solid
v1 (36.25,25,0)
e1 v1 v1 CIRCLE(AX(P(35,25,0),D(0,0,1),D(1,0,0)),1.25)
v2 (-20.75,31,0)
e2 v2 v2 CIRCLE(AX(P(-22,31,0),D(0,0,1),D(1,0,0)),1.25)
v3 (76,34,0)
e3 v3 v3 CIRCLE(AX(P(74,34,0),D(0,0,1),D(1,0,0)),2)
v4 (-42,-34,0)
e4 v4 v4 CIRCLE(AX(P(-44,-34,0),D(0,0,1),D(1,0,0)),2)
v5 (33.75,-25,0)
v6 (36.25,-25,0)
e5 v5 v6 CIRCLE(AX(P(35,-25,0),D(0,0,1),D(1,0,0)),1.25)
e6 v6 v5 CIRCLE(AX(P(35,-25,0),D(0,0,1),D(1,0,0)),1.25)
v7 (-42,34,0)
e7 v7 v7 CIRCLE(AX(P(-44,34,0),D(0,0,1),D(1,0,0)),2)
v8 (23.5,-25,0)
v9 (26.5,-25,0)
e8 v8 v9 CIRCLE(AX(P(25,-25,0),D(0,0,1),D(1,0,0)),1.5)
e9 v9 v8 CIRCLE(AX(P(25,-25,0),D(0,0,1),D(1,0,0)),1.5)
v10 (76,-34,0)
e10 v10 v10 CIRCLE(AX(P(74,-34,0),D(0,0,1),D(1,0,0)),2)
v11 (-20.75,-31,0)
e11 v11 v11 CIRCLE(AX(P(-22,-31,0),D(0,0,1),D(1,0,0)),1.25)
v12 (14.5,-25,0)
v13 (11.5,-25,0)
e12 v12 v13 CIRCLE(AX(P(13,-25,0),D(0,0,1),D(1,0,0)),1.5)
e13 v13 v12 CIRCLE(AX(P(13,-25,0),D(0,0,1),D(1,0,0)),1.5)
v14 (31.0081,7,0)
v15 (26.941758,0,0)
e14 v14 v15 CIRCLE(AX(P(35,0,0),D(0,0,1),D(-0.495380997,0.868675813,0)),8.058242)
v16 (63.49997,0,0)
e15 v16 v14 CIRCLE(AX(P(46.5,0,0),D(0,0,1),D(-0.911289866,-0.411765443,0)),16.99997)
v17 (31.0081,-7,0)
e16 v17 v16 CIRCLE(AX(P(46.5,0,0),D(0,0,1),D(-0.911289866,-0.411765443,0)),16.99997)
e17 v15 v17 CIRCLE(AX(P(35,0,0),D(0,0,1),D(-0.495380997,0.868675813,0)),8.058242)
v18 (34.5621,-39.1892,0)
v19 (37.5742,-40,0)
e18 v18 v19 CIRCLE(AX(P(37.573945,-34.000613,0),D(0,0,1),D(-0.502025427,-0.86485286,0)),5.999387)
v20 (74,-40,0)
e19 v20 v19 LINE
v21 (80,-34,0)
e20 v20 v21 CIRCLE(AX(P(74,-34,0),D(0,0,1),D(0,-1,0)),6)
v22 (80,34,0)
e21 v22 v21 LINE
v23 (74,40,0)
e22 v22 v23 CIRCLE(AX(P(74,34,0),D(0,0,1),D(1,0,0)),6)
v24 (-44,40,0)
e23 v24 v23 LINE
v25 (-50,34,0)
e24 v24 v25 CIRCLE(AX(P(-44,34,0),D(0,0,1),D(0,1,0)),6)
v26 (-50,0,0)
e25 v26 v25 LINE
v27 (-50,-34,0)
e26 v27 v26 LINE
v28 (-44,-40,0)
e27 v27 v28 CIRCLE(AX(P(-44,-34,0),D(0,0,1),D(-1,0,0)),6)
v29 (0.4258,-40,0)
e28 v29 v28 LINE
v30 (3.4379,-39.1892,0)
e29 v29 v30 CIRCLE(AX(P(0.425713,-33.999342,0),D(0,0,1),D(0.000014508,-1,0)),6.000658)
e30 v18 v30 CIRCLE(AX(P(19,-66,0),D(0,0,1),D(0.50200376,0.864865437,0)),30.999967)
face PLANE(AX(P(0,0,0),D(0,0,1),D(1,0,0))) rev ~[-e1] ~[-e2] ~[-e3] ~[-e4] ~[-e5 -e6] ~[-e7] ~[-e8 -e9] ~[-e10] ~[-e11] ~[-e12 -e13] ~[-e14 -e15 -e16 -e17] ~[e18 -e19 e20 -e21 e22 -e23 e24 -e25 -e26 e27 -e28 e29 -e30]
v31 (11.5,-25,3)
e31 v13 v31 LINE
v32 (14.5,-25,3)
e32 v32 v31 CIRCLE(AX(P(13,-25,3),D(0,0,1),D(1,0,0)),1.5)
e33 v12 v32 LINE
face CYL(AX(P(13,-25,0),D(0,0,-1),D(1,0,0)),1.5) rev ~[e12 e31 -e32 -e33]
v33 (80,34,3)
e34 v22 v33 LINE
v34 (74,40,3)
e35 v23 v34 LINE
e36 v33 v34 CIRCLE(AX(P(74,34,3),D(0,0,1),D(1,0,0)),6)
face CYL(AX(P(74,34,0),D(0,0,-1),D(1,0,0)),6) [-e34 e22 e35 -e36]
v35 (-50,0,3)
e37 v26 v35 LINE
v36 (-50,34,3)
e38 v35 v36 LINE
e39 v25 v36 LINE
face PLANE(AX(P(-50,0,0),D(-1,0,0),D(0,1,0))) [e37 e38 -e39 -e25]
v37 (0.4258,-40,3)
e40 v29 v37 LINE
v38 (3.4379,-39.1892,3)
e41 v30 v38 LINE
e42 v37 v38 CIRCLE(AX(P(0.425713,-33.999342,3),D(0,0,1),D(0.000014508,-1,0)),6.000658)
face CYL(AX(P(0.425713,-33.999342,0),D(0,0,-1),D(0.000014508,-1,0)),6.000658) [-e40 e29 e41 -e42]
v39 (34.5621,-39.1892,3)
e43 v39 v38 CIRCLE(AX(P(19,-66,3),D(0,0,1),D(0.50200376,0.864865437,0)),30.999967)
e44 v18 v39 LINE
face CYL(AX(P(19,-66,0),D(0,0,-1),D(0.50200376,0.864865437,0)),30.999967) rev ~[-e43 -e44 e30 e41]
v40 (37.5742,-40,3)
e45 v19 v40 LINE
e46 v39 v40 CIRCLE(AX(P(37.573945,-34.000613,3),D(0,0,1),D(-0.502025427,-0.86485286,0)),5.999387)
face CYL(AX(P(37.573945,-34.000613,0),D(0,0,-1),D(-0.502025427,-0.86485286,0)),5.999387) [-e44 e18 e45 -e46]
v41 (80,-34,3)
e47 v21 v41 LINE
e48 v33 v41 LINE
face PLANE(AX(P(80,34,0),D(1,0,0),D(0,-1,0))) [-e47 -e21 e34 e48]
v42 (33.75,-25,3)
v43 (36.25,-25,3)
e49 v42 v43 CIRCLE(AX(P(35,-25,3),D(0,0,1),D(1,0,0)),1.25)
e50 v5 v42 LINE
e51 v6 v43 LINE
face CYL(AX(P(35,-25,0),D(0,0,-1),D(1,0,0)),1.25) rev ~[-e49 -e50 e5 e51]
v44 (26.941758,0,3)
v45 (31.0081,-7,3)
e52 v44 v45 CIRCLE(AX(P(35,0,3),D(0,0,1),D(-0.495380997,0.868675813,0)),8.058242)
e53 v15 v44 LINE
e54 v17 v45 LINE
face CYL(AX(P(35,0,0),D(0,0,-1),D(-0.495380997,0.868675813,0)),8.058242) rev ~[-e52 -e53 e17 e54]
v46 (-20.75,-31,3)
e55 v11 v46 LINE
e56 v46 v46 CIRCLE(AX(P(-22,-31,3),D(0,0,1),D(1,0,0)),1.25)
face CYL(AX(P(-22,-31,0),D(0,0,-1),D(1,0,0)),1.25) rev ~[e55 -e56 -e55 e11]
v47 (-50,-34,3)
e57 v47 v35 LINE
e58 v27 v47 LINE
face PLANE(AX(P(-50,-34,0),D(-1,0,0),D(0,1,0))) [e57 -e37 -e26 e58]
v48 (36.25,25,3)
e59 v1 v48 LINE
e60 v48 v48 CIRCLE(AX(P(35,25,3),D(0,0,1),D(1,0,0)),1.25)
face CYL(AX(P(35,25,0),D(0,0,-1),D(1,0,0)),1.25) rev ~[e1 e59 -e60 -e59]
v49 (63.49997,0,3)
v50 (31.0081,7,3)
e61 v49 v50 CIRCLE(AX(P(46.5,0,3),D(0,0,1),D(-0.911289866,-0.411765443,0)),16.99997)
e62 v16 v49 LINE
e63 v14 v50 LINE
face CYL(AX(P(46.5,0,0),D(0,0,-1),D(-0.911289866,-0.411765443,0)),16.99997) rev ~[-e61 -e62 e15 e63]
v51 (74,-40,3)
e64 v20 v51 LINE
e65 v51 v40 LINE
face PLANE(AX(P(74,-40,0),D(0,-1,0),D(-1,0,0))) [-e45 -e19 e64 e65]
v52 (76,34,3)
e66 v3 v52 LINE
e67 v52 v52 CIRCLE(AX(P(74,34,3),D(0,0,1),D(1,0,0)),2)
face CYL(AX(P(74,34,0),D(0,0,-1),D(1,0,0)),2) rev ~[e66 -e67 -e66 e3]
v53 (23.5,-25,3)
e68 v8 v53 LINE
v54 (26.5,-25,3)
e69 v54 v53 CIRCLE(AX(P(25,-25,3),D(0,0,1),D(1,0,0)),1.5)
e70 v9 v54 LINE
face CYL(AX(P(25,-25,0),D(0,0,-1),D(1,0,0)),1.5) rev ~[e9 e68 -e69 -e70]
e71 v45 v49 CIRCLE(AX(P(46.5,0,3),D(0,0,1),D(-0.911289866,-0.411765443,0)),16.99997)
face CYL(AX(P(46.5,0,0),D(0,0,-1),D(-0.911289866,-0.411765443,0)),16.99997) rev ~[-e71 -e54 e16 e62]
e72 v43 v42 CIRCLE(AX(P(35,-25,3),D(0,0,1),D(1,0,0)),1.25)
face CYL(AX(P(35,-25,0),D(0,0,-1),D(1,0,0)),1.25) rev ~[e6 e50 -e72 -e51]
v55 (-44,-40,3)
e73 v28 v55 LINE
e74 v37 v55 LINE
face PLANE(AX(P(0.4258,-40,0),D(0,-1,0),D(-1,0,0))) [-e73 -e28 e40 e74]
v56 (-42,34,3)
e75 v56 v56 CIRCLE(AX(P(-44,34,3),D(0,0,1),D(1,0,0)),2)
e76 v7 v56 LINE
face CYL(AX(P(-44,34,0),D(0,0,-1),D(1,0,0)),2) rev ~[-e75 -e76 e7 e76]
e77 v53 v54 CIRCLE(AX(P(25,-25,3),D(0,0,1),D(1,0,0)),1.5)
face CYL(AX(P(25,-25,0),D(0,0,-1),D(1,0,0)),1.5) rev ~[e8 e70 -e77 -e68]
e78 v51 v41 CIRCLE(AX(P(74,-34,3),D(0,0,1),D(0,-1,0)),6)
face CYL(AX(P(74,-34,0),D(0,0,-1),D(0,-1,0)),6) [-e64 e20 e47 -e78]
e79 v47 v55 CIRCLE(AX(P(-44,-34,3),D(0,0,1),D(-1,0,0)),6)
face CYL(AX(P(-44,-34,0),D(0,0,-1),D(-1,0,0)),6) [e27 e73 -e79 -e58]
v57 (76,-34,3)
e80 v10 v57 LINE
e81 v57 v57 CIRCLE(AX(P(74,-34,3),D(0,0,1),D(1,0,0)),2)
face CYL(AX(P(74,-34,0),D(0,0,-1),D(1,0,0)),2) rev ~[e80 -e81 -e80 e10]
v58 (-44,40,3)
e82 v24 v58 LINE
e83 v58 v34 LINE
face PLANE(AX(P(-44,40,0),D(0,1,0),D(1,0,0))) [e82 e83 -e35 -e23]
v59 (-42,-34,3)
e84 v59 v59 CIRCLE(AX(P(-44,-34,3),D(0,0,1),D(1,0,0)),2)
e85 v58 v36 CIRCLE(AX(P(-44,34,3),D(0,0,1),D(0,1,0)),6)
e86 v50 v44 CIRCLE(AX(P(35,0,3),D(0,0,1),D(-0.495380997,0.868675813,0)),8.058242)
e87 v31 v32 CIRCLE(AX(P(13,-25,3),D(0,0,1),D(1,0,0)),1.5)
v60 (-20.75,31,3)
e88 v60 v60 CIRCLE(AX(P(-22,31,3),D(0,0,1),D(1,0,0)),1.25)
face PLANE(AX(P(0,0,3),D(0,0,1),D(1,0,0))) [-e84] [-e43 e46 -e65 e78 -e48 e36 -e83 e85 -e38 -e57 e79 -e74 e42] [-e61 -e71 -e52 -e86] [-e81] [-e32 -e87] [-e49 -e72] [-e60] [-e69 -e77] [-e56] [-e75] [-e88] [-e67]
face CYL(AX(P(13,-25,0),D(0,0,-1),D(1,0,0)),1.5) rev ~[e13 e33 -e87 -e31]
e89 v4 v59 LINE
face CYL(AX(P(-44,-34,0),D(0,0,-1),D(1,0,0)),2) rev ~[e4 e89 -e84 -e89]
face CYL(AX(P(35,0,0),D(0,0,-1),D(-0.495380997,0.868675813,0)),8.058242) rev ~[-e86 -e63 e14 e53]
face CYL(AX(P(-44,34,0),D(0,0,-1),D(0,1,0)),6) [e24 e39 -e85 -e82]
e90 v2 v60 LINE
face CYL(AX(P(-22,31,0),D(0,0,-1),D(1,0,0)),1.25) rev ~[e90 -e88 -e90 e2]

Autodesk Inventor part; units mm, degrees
ref_plane "YZ Plane" through (0, 0, 0) normal (1, 0, 0) x (0, 1, 0)
ref_plane "XZ Plane" through (0, 0, 0) normal (0, 1, 0) x (-1, 0, 0)
ref_plane "XY Plane" through (0, 0, 0) normal (0, 0, 1) x (1, 0, 0)
sketch "Эскиз1" plane through (0, 0, 0) normal (0, 0, 1) x (1, 0, 0)
  line L0 (-63, 0) -> (70, 0)
  line L1 (0, 29) -> (0, -30)
  circle A0 centre (35, 25) radius 1.25
  circle A1 centre (-22, 31) radius 1.25
  circle A2 centre (-22, -31) radius 1.25
  circle A3 centre (35, -25) radius 1.25
  arc A4 (31.0081, -7) -> (31.0081, 7) centre (46.5, 0) ccw
  line L2 (35, -25) -> (0, -25)
  circle A5 centre (25, -25) radius 1.5
  circle A6 centre (13, -25) radius 1.5
  arc A7 (31.0081, 7) -> (31.0081, -7) centre (35, 0) ccw
  line L3 (-44, 40) -> (74, 40)
  line L4 (80, 34) -> (80, -34)
  line L5 (-50, -34) -> (-50, 34)
  arc A8 (-44, 40) -> (-50, 34) centre (-44, 34) ccw
  arc A9 (-50, -34) -> (-44, -40) centre (-44, -34) ccw
  arc A10 (74, -40) -> (80, -34) centre (74, -34) ccw
  arc A11 (80, 34) -> (74, 40) centre (74, 34) ccw
  circle A12 centre (-44, 34) radius 2
  circle A13 centre (-44, -34) radius 2
  circle A14 centre (74, -34) radius 2
  circle A15 centre (74, 34) radius 2
  arc A16 (34.5621, -39.1892) -> (3.4379, -39.1892) centre (19, -66) ccw
  line L6 (74, -40) -> (37.5742, -40)
  line L7 (0.4258, -40) -> (-44, -40)
  arc A17 (0.4258, -40) -> (3.4379, -39.1892) centre (0.4258, -34) ccw
  arc A18 (34.5621, -39.1892) -> (37.5742, -40) centre (37.5742, -34) ccw
  point P0 (0, 0)
  point P1 (-50, 40)
  point P2 (80, 40)
  point P3 (80, -40)
  point P4 (-50, -40)
  point P5 (2.1181, -40)
  point P6 (35.8819, -40)
  dimension "d3" = 2.5
  dimension "d4" = 2.5
  dimension "d5" = 2.5
  dimension "d6" = 2.5
  dimension "d9" = 62
  dimension "d10" = 50
  dimension "d11" = 34
  dimension "d12" = 3
  dimension "d14" = 10
  dimension "d16" = 3
  dimension "d17" = 12
  dimension "d19" = 46.5
  dimension "d20" = 130
  dimension "d21" = 80
  dimension "d22" = 130
  dimension "d23" = 6
  dimension "d24" = 4
  dimension "d25" = 4
  dimension "d26" = 4
  dimension "d27" = 4
  dimension "d31" = 6
extrude "Выдавливание1" add sketch "Эскиз1" along normal blind 3
properties part number "06-01-Платформа для лидара"
